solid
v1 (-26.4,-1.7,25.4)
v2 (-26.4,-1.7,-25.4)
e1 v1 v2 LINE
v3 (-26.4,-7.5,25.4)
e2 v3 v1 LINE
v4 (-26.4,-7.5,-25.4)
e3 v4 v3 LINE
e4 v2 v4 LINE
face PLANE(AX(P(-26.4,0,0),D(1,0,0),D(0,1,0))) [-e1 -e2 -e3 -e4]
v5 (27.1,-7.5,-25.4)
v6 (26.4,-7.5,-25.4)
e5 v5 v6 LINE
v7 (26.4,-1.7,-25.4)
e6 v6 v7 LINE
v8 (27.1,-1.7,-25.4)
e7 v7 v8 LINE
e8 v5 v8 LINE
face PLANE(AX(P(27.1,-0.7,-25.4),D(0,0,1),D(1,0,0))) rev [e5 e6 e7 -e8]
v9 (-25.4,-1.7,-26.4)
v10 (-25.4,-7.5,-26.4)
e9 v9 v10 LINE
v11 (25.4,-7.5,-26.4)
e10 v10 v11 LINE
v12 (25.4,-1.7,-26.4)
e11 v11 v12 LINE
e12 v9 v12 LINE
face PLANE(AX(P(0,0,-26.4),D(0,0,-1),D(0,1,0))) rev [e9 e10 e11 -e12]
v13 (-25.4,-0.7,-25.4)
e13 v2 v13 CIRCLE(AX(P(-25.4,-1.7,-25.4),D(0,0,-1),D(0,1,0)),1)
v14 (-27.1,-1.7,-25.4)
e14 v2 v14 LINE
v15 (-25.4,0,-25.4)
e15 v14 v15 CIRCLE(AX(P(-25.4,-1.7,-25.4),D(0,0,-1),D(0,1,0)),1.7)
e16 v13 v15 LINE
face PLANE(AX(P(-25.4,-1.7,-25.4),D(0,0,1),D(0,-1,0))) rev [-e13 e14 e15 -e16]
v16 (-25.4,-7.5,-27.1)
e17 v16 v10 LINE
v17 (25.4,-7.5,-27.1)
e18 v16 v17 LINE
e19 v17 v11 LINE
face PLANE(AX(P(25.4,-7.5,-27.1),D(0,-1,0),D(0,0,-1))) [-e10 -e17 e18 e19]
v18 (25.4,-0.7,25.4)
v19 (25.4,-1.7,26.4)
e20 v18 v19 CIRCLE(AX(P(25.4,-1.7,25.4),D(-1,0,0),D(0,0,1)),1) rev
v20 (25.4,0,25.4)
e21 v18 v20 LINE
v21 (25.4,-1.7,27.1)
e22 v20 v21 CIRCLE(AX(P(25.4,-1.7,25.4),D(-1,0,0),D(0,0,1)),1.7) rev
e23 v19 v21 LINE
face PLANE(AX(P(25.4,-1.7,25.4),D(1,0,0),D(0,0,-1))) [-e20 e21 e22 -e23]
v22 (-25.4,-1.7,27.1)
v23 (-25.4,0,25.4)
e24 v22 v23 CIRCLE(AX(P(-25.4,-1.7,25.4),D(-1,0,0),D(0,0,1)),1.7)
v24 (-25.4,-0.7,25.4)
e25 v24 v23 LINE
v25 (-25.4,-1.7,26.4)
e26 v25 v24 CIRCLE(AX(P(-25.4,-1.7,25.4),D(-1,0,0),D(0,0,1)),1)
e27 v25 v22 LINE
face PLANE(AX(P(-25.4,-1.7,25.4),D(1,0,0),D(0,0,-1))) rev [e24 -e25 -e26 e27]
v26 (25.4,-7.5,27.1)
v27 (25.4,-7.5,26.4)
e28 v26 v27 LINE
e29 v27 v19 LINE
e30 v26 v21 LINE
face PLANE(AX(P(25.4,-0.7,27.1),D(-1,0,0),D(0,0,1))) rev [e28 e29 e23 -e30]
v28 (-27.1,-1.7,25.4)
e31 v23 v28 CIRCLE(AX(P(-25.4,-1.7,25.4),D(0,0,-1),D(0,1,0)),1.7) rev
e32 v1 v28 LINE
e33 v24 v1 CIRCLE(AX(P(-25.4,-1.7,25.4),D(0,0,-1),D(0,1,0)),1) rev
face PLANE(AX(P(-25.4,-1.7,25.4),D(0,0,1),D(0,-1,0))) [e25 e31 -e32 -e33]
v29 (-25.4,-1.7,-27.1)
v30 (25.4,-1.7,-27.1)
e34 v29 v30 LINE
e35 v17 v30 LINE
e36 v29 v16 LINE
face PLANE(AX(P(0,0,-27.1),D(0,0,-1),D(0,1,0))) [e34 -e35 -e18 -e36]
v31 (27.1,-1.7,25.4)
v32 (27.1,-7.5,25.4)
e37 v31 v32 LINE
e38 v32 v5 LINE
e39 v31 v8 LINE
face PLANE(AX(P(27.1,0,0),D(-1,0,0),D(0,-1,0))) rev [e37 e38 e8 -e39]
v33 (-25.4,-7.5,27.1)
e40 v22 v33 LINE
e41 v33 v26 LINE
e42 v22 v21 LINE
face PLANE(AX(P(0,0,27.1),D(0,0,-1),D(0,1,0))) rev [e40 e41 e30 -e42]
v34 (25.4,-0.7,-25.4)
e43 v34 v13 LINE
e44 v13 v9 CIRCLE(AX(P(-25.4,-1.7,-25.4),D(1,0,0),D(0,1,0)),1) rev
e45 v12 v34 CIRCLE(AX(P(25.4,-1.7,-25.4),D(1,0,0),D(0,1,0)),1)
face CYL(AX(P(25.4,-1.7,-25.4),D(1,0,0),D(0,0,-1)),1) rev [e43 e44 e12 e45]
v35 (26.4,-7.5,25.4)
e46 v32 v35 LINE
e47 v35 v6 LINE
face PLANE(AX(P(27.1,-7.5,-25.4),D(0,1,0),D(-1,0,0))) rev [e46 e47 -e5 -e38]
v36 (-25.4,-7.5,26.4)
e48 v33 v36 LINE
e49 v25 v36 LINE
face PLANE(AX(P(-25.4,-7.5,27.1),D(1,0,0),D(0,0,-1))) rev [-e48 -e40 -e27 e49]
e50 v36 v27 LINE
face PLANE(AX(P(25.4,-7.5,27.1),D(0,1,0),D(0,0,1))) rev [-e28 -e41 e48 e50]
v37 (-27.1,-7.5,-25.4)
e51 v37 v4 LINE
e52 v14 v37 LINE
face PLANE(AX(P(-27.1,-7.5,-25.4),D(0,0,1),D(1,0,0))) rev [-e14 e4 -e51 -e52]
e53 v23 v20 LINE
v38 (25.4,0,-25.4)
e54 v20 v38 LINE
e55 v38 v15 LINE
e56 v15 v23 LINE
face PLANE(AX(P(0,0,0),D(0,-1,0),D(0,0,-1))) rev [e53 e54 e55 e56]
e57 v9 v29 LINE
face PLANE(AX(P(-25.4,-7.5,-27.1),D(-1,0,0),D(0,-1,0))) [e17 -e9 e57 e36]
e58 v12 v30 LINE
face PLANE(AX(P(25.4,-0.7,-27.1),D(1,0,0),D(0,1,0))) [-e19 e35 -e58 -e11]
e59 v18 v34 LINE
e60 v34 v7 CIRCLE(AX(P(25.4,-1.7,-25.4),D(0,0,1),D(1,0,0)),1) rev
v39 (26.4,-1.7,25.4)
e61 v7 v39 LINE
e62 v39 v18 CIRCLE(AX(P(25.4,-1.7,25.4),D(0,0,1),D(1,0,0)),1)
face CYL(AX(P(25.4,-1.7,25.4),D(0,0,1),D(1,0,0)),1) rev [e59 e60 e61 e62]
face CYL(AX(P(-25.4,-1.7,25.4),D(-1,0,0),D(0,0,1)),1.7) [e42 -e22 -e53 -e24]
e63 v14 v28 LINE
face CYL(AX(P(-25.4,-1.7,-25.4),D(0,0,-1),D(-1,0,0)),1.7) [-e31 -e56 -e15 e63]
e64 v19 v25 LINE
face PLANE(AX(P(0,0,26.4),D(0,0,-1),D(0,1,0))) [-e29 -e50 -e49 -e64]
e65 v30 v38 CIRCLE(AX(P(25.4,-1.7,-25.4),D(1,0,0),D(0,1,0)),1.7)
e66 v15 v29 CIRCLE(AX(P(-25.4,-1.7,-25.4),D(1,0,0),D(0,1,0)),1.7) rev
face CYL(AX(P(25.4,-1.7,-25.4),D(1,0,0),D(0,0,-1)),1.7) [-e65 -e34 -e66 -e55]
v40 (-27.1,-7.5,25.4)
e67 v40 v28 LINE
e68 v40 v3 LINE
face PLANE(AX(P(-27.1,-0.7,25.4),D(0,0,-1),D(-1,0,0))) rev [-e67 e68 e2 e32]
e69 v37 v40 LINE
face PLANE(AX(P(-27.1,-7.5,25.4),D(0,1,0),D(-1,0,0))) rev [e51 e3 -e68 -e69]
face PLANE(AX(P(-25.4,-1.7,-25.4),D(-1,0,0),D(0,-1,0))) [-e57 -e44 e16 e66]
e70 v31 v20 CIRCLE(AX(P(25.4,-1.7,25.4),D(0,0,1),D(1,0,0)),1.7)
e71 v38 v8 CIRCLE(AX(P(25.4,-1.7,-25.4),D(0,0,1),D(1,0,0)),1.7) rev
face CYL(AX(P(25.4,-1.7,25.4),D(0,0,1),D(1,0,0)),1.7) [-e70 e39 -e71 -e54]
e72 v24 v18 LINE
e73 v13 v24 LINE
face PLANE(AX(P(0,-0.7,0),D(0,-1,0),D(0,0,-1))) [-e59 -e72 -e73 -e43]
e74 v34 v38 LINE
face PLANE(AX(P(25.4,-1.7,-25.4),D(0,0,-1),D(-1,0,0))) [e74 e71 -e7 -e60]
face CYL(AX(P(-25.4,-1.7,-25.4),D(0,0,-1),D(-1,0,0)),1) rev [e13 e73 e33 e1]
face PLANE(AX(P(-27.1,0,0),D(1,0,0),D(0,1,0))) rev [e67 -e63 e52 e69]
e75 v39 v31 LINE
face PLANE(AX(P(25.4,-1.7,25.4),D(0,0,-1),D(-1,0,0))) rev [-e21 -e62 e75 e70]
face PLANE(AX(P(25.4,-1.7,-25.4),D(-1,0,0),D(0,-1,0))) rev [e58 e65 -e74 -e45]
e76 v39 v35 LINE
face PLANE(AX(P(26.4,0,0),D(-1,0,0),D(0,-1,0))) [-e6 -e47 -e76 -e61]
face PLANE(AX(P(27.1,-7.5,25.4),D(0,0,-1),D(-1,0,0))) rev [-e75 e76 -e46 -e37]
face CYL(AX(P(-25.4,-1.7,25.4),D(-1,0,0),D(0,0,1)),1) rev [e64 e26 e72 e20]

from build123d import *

# Parameters (mm, degrees)
SKETCH1_W          = 50.8
SKETCH1_H          = 50.8
BASE_FLANGE1_DEPTH = 0.7
EDGE_FLANGE1_DEPTH = 50.8
EDGE_FLANGE2_DEPTH = 50.8
EDGE_FLANGE3_DEPTH = 50.8
EDGE_FLANGE4_DEPTH = 50.8


# Sheet-metal steps are written as plain solids
with BuildPart() as part:
    # Sketch1 → Base-Flange1 (new body)
    with BuildSketch(Plane(origin=(0, 0, 0), x_dir=(1, 0, 0), z_dir=(0, 1, 0))):
        Rectangle(SKETCH1_W, SKETCH1_H)
    extrude(amount=-BASE_FLANGE1_DEPTH)

    # Edge-Flange1 section (across the edge) → Edge-Flange1 (add)
    with BuildSketch(Plane(origin=(26.4, -0.7, -25.4), x_dir=(-1, 0, 0), z_dir=(0, 0, 1))):
        with BuildLine():
            Line((-0.7, 1), (-0.7, 6.8))
            Line((-0.7, 6.8), (0, 6.8))
            Line((0, 6.8), (0, 1))
            ThreePointArc((0, 1), (0.292893219, 0.292893219), (1, 0))
            Line((1, 0), (1, -0.7))
            ThreePointArc((1, -0.7), (-0.202081528, -0.202081528), (-0.7, 1))
        make_face()
    extrude(amount=EDGE_FLANGE1_DEPTH)

    # Edge-Flange2 section (across the edge) → Edge-Flange2 (add)
    with BuildSketch(Plane(origin=(25.4, -0.7, 26.4), x_dir=(0, 0, -1), z_dir=(-1, 0, 0))):
        with BuildLine():
            Line((-0.7, 1), (-0.7, 6.8))
            Line((-0.7, 6.8), (0, 6.8))
            Line((0, 6.8), (0, 1))
            ThreePointArc((0, 1), (0.292893219, 0.292893219), (1, 0))
            Line((1, 0), (1, -0.7))
            ThreePointArc((1, -0.7), (-0.202081528, -0.202081528), (-0.7, 1))
        make_face()
    extrude(amount=EDGE_FLANGE2_DEPTH)

    # Edge-Flange3 section (across the edge) → Edge-Flange3 (add)
    with BuildSketch(Plane(origin=(-26.4, -0.7, 25.4), x_dir=(1, 0, 0), z_dir=(0, 0, -1))):
        with BuildLine():
            Line((-0.7, 1), (-0.7, 6.8))
            Line((-0.7, 6.8), (0, 6.8))
            Line((0, 6.8), (0, 1))
            ThreePointArc((0, 1), (0.292893219, 0.292893219), (1, 0))
            Line((1, 0), (1, -0.7))
            ThreePointArc((1, -0.7), (-0.202081528, -0.202081528), (-0.7, 1))
        make_face()
    extrude(amount=EDGE_FLANGE3_DEPTH)

    # Edge-Flange4 section (across the edge) → Edge-Flange4 (add)
    with BuildSketch(Plane(origin=(-25.4, -0.7, -26.4), x_dir=(0, 0, 1), z_dir=(1, 0, 0))):
        with BuildLine():
            Line((-0.7, 1), (-0.7, 6.8))
            Line((-0.7, 6.8), (0, 6.8))
            Line((0, 6.8), (0, 1))
            ThreePointArc((0, 1), (0.292893219, 0.292893219), (1, 0))
            Line((1, 0), (1, -0.7))
            ThreePointArc((1, -0.7), (-0.202081528, -0.202081528), (-0.7, 1))
        make_face()
    extrude(amount=EDGE_FLANGE4_DEPTH)


solid = part.part
